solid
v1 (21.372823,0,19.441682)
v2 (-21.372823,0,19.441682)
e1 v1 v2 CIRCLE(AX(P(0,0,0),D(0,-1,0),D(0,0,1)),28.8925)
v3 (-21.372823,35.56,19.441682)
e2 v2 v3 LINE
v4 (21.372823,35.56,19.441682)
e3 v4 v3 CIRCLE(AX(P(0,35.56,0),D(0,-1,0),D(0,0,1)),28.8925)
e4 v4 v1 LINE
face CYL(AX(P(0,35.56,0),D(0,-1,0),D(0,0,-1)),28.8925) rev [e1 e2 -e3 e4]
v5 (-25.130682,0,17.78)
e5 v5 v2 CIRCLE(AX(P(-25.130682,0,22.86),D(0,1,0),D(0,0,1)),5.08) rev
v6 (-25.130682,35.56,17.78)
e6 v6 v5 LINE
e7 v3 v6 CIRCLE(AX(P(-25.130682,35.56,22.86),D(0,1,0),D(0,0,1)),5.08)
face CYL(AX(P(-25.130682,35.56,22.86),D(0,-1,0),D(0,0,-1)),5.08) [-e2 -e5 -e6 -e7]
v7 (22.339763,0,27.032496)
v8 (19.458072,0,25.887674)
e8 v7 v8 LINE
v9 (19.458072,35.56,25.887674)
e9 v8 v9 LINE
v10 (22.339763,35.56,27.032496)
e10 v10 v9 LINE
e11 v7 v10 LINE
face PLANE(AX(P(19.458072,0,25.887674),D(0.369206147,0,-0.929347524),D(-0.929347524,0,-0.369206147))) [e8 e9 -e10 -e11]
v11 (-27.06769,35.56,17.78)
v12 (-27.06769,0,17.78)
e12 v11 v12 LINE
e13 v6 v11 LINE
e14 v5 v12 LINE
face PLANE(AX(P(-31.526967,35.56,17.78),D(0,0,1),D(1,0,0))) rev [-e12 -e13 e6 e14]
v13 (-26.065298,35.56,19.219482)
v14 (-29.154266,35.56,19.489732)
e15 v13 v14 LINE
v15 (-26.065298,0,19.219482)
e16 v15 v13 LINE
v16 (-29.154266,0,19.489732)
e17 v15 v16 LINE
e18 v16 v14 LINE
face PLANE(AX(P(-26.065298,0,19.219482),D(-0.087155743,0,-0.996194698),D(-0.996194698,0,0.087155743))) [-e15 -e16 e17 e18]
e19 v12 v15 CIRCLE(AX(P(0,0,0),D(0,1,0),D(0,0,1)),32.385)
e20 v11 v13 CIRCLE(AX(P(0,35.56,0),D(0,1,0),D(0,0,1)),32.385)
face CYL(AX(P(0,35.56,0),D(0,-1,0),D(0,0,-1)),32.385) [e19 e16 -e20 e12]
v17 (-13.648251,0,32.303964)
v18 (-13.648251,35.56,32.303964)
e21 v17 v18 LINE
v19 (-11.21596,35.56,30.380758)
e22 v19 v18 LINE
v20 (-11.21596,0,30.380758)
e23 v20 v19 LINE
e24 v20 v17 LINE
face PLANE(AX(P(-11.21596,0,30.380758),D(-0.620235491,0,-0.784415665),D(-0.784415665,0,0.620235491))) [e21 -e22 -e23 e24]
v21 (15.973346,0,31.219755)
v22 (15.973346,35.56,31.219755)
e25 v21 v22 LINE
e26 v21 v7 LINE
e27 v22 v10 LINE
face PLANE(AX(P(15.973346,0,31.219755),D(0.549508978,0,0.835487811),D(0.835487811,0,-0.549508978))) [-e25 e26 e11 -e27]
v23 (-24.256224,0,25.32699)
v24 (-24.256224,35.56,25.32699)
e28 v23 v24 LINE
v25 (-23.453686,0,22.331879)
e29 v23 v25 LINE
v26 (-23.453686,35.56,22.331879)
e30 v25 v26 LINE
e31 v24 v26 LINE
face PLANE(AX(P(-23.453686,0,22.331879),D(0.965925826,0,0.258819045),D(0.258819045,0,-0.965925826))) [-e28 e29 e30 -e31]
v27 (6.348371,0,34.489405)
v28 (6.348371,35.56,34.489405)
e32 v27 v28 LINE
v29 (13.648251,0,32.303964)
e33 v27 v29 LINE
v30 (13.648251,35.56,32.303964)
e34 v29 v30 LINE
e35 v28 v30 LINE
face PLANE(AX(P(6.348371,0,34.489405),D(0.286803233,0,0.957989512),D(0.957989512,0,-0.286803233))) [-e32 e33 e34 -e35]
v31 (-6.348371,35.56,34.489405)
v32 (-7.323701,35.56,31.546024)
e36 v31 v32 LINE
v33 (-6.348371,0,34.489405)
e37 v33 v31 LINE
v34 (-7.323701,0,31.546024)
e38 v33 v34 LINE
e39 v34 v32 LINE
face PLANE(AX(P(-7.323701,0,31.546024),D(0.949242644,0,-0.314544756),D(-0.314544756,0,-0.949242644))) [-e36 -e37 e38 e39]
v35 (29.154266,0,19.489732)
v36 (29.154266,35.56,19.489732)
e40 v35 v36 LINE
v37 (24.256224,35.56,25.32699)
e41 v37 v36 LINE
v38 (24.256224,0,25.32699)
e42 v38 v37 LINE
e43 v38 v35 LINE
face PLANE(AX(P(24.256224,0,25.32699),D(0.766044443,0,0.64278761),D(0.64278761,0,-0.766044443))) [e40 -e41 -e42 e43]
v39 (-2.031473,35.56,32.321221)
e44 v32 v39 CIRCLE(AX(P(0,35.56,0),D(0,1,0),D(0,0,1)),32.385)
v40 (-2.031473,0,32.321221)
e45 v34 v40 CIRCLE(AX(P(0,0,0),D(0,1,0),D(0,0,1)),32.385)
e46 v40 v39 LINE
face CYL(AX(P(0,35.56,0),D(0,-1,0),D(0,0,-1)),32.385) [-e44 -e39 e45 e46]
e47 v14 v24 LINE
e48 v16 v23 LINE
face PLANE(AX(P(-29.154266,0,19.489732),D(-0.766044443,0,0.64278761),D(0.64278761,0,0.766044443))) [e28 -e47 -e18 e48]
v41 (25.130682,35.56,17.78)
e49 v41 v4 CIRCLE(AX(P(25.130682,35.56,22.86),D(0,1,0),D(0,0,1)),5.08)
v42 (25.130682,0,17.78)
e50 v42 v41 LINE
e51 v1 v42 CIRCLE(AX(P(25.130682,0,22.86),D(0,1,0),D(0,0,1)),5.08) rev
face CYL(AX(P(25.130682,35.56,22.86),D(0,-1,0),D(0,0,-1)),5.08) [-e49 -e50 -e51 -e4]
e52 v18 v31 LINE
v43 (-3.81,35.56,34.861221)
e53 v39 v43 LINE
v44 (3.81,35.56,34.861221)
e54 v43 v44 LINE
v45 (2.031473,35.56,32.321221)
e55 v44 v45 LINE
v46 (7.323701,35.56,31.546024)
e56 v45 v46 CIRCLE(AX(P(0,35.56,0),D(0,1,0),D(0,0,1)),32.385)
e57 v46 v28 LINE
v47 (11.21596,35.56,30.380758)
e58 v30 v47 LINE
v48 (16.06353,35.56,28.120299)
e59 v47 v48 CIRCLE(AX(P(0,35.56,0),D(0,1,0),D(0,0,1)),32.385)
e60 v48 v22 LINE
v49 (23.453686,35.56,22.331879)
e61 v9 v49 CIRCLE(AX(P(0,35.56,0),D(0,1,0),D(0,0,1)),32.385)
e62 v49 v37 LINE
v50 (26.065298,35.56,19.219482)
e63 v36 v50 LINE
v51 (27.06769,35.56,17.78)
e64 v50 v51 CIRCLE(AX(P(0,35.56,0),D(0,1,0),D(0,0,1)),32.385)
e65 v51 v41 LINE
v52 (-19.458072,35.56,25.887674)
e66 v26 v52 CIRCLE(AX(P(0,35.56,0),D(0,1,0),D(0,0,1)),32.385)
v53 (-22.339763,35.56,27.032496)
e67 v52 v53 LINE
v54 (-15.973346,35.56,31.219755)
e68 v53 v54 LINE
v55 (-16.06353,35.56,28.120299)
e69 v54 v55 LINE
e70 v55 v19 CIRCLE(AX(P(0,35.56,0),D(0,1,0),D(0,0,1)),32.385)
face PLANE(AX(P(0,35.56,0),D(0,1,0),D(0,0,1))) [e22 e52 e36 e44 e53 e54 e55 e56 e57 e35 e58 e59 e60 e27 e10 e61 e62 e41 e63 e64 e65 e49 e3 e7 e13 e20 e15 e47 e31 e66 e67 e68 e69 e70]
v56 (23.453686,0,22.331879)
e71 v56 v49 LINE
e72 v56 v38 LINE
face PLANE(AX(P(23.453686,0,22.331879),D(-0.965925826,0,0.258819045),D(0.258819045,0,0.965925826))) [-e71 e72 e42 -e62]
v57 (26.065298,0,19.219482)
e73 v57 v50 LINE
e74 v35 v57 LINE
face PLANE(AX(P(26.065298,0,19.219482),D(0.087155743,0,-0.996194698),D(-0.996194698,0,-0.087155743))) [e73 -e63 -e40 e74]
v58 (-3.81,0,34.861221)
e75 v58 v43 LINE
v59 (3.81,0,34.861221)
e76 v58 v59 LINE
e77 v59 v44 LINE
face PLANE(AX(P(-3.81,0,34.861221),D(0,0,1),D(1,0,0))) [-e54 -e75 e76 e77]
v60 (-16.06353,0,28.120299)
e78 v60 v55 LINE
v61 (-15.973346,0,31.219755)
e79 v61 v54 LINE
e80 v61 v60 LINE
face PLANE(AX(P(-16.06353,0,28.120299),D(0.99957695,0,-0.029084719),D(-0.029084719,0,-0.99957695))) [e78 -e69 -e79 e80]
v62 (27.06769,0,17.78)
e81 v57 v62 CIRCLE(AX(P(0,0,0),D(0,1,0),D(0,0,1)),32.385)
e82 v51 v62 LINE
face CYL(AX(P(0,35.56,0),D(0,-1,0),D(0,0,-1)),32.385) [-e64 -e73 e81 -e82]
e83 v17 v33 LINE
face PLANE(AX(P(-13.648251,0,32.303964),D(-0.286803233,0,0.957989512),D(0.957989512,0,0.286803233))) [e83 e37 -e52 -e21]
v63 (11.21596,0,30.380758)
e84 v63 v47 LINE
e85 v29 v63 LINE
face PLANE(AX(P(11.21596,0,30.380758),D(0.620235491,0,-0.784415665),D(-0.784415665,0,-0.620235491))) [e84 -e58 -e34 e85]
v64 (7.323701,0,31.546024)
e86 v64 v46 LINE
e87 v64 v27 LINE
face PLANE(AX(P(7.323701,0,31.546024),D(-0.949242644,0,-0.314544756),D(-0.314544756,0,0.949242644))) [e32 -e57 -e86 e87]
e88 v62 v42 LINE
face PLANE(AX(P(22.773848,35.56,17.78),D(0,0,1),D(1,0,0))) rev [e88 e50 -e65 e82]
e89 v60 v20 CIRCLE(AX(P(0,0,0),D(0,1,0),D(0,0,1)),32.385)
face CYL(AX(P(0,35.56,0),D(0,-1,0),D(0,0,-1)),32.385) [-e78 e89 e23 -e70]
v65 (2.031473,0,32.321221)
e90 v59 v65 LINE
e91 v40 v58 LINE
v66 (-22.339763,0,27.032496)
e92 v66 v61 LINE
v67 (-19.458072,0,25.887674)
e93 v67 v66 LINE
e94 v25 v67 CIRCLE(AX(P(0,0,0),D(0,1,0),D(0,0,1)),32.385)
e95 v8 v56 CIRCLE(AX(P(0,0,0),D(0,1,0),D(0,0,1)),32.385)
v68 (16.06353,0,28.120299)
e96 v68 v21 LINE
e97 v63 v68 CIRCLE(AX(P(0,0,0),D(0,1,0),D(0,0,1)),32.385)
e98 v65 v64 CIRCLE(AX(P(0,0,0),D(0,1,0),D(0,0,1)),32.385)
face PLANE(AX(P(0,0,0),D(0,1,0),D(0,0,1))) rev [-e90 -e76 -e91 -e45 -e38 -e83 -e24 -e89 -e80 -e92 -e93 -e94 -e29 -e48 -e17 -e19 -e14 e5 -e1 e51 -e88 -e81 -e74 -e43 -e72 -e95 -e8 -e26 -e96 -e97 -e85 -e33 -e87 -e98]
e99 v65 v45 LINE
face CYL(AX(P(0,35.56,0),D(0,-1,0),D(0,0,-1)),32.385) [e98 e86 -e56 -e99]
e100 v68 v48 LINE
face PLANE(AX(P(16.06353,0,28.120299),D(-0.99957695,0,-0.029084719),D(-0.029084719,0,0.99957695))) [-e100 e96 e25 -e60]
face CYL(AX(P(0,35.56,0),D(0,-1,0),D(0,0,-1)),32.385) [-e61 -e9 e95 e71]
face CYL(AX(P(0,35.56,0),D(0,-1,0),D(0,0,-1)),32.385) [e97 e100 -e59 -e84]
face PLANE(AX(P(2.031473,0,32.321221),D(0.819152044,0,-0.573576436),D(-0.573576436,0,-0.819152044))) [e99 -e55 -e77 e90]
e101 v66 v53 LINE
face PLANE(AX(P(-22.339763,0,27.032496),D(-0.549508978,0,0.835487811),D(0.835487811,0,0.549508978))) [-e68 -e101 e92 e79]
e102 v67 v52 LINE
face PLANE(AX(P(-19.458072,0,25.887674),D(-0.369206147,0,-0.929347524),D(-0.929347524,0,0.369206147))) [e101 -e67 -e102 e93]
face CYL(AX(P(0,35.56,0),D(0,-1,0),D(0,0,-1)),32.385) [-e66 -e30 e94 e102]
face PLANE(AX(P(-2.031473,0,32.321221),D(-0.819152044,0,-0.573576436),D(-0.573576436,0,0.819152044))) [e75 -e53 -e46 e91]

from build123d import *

# Parameters (mm, degrees)
BOSS_EXTRUDE1_DEPTH = 35.56
CAVITY1_DEPTH       = 35.56
FILLET1_R           = 5.08


# Read off the part's stored shape, not the designer's step: Cavity1
with BuildPart() as part:
    # Sketch1 → Boss-Extrude1 (new body)
    with BuildSketch(Plane(origin=(0, 0, 0), x_dir=(1, 0, 0), z_dir=(0, 1, 0))):
        with BuildLine():
            Line((-31.526966632, -17.78), (-22.773848077, -17.78))
            ThreePointArc((-22.773848077, -17.78), (0, -28.8925), (22.773848077, -17.78))
            Line((22.773848077, -17.78), (31.526966632, -17.78))
            ThreePointArc((31.526966632, -17.78), (0, -36.195), (-31.526966632, -17.78))
        make_face()
    extrude(amount=BOSS_EXTRUDE1_DEPTH)

    # Cavity1 outline → Cavity1 (cut)
    with BuildSketch(Plane(origin=(0, 0, 0), x_dir=(1, 0, 0), z_dir=(0, 1, 0))):
        with BuildLine():
            Line((31.526966632, -17.78), (27.067689687, -17.78))
            ThreePointArc((27.067689687, -17.78), (26.576241445, -18.506529001), (26.065297512, -19.219482059))
            Line((26.065297512, -19.219482059), (29.154265611, -19.489731749))
            Line((29.154265611, -19.489731749), (24.256224025, -25.326990406))
            Line((24.256224025, -25.326990406), (23.453686354, -22.331879039))
            ThreePointArc((23.453686354, -22.331879039), (21.529414108, -24.192406932), (19.458072067, -25.887673832))
            Line((19.458072067, -25.887673832), (22.339762624, -27.032496238))
            Line((22.339762624, -27.032496238), (15.973345502, -31.219754651))
            Line((15.973345502, -31.219754651), (16.063530451, -28.120298975))
            ThreePointArc((16.063530451, -28.120298975), (13.686492406, -29.350777683), (11.215960427, -30.380758001))
            Line((11.215960427, -30.380758001), (13.648250992, -32.303964027))
            Line((13.648250992, -32.303964027), (6.348370909, -34.48940466))
            Line((6.348370909, -34.48940466), (7.323701052, -31.546023963))
            ThreePointArc((7.323701052, -31.546023963), (4.693618264, -32.043067465), (2.031472853, -32.321221249))
            Line((2.031472853, -32.321221249), (3.81, -34.861221249))
            Line((3.81, -34.861221249), (-3.81, -34.861221249))
            Line((-3.81, -34.861221249), (-2.031472853, -32.321221249))
            ThreePointArc((-2.031472853, -32.321221249), (-4.693618264, -32.043067465), (-7.323701052, -31.546023963))
            Line((-7.323701052, -31.546023963), (-6.348370909, -34.48940466))
            Line((-6.348370909, -34.48940466), (-13.648250992, -32.303964027))
            Line((-13.648250992, -32.303964027), (-11.215960427, -30.380758001))
            ThreePointArc((-11.215960427, -30.380758001), (-13.686492406, -29.350777683), (-16.063530451, -28.120298975))
            Line((-16.063530451, -28.120298975), (-15.973345502, -31.219754651))
            Line((-15.973345502, -31.219754651), (-22.339762624, -27.032496238))
            Line((-22.339762624, -27.032496238), (-19.458072067, -25.887673832))
            ThreePointArc((-19.458072067, -25.887673832), (-21.529414108, -24.192406932), (-23.453686354, -22.331879039))
            Line((-23.453686354, -22.331879039), (-24.256224025, -25.326990406))
            Line((-24.256224025, -25.326990406), (-29.154265611, -19.489731749))
            Line((-29.154265611, -19.489731749), (-26.065297512, -19.219482059))
            ThreePointArc((-26.065297512, -19.219482059), (-26.576241445, -18.506529001), (-27.067689687, -17.78))
            Line((-27.067689687, -17.78), (-31.526966632, -17.78))
            ThreePointArc((-31.526966632, -17.78), (0, -36.195), (31.526966632, -17.78))
        make_face()
    extrude(amount=CAVITY1_DEPTH, mode=Mode.SUBTRACT)

    # Fillet1
    fillet1_edges = [part.edges().sort_by_distance(p)[0] for p in [
        (-22.773848077, 17.78, 17.78),
        (22.773848077, 17.78, 17.78),
    ]]
    fillet(fillet1_edges, radius=FILLET1_R)


solid = part.part
